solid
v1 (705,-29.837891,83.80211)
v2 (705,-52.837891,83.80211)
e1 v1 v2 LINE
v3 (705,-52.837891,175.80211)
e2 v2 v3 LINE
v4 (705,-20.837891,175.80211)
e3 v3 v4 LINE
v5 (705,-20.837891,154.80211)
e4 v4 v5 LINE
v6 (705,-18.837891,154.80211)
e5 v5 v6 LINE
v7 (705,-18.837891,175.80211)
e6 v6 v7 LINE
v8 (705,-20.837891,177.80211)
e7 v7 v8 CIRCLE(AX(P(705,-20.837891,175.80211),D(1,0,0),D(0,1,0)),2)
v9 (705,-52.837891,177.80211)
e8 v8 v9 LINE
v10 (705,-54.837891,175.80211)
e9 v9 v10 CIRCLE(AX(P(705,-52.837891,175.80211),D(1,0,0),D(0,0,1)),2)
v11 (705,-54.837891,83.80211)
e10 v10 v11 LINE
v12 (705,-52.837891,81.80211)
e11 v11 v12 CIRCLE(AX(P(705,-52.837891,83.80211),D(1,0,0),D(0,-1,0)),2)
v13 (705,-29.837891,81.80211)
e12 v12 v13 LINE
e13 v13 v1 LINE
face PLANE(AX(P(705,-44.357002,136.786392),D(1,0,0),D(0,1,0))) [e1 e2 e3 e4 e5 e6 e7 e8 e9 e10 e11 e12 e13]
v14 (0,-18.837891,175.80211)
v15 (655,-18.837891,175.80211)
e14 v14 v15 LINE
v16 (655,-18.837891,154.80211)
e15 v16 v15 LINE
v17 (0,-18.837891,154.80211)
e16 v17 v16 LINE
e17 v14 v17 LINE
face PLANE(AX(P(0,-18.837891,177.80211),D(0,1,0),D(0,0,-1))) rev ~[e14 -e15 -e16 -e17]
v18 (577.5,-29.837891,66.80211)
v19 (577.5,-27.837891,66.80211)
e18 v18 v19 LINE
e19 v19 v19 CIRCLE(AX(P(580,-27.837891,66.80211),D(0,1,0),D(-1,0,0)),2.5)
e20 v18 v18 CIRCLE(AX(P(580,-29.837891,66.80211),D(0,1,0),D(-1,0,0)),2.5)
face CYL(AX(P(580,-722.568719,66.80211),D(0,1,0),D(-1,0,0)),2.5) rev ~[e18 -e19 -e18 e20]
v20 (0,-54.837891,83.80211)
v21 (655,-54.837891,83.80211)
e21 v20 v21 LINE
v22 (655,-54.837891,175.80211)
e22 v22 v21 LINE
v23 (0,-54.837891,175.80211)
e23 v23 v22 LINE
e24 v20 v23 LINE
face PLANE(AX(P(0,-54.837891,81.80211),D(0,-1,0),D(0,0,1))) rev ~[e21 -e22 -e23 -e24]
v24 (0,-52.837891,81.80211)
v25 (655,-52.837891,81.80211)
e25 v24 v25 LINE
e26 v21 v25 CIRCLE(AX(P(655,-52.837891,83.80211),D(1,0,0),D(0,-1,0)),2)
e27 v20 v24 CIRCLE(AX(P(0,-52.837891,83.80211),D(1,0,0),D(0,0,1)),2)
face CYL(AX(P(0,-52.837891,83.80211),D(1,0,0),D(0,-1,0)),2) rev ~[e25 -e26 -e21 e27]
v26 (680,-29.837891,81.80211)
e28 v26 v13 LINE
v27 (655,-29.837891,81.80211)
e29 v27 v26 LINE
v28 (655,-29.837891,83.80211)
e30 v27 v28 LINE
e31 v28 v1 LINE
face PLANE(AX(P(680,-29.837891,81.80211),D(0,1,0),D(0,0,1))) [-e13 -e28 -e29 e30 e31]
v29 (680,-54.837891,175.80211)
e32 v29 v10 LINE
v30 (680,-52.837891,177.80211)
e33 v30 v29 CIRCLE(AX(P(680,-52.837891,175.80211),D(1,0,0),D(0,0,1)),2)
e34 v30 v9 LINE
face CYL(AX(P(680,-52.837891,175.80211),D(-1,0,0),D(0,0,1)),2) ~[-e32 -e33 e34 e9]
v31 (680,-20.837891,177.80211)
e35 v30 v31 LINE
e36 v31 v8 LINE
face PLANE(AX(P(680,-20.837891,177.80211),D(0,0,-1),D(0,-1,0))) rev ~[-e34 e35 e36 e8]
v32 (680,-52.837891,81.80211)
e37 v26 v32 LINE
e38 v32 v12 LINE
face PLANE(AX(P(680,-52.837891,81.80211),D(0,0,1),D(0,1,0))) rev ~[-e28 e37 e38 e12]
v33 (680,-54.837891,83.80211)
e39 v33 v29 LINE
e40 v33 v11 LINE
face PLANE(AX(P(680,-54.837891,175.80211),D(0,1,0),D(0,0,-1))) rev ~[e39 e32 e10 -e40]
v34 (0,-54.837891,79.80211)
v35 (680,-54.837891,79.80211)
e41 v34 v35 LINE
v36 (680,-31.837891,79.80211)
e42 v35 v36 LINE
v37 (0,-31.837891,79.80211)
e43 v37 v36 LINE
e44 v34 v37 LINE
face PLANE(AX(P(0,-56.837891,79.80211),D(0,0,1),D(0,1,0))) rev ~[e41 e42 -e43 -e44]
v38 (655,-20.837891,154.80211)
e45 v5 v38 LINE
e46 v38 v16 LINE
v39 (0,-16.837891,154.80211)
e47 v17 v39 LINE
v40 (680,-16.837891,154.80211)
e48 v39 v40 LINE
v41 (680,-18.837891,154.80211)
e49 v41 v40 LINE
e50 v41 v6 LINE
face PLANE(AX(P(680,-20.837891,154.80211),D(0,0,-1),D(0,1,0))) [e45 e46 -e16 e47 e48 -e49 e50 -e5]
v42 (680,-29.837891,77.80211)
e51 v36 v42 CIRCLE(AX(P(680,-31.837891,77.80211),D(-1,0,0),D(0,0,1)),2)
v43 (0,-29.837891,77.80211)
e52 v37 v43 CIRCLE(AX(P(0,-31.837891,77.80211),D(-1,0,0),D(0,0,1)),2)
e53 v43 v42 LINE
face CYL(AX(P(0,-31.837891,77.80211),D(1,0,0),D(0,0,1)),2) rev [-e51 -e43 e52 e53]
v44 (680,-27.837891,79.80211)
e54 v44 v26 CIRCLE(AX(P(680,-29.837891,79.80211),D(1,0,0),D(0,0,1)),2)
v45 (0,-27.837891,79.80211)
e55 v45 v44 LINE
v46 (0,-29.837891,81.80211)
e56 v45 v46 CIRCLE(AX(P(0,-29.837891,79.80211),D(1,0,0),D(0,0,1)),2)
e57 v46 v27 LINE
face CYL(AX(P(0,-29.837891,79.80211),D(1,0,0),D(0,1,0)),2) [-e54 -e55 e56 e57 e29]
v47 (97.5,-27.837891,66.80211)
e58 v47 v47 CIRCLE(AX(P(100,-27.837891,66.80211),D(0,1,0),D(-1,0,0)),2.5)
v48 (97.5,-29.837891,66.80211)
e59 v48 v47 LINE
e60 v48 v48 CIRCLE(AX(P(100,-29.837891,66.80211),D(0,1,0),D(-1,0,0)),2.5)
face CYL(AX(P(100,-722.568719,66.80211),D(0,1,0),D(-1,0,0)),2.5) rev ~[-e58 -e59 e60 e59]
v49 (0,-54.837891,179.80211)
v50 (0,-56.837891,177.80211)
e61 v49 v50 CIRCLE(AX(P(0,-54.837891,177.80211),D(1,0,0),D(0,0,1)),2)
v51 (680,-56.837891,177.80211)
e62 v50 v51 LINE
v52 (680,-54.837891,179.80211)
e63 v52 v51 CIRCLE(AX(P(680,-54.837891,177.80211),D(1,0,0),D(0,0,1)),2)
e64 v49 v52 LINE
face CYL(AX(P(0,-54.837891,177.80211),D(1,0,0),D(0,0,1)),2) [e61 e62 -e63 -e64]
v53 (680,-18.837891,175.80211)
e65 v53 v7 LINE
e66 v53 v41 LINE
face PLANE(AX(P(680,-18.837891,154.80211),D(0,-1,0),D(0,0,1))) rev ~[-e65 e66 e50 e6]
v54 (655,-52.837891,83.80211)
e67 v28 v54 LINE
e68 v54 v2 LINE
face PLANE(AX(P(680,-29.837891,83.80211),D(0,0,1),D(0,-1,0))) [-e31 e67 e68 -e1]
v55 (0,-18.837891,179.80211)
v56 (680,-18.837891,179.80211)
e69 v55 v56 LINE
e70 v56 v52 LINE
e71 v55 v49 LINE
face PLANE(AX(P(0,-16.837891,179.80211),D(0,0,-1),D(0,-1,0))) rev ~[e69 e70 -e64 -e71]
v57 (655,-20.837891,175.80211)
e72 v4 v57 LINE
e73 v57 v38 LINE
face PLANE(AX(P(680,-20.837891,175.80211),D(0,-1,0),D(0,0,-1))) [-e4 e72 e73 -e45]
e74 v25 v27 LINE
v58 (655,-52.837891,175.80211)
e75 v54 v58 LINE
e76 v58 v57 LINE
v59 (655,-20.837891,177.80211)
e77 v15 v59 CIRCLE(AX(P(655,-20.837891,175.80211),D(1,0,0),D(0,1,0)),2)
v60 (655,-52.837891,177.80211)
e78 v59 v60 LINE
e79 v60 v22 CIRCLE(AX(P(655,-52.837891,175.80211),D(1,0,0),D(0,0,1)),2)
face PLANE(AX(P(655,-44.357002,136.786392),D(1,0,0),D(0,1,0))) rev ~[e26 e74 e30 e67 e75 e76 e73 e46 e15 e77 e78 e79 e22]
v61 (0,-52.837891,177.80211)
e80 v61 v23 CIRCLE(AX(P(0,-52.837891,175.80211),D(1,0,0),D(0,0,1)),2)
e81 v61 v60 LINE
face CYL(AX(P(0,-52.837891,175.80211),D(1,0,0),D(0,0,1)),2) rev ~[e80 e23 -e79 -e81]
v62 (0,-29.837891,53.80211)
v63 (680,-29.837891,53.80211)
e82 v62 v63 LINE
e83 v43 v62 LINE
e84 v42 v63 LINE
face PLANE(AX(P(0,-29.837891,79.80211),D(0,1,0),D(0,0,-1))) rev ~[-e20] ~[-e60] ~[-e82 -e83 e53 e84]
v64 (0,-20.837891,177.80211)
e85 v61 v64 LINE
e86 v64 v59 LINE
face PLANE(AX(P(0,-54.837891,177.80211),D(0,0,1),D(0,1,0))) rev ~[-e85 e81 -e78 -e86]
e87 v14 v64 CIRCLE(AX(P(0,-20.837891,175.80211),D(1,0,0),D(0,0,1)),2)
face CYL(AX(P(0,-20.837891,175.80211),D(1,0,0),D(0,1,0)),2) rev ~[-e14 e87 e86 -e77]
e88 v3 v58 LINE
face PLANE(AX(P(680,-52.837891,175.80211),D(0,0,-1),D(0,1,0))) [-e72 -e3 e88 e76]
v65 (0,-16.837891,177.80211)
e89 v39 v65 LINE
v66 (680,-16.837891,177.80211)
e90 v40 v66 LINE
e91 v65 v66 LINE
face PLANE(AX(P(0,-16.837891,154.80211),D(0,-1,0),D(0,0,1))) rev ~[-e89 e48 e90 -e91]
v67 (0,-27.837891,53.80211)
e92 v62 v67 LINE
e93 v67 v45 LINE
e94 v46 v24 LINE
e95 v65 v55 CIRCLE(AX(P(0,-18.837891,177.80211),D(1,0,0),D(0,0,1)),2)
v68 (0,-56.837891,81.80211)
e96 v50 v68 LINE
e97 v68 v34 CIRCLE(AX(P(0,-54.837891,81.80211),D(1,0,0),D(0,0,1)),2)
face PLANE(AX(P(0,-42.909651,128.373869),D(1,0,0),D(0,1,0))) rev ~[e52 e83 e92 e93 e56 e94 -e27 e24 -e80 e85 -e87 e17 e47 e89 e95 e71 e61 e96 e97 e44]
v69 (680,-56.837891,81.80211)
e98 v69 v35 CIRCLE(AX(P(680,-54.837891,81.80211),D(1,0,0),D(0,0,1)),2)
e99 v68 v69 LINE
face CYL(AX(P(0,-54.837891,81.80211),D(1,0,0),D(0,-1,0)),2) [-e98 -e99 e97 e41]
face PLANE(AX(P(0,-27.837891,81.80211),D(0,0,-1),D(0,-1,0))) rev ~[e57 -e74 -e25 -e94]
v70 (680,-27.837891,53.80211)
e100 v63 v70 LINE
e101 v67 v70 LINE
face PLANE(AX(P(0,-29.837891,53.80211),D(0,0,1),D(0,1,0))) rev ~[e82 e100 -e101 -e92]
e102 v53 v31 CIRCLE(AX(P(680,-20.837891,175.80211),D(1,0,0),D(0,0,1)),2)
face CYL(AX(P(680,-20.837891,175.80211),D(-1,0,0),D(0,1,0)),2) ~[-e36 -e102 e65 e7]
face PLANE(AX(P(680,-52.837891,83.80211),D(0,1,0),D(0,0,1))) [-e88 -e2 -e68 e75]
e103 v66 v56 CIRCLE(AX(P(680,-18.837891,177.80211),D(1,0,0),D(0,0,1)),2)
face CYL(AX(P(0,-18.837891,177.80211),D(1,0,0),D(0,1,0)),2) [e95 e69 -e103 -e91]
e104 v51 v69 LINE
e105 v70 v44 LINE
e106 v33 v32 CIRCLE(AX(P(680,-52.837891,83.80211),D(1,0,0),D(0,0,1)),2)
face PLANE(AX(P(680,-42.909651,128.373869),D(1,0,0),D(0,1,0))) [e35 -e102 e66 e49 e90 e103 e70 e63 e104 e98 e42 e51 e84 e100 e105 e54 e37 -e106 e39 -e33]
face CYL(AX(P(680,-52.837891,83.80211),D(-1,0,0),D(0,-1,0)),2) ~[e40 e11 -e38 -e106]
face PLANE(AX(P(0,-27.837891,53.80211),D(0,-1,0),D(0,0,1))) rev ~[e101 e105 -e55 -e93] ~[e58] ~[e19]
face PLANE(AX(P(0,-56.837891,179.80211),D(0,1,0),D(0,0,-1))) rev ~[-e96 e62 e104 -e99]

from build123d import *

# Parameters (mm, degrees)
F1_DEPTH      = 680
F3_D          = 5
F4_R          = 2
F6_DEPTH      = 25
F6_DEPTH_BACK = 25


# Not quite as in the source:
# - a feature names something its author has since deleted; it is built from what else it names


with BuildPart() as f1:
    # F0 (on Right) → F1 (new body)
    with BuildSketch(Plane.YZ):
        Polygon((-18.8378913403, 177.8021101952), (-18.8378913403, 154.8021101952), (-16.8378913403, 154.8021101952), (-16.8378913403, 179.8021101952), (-56.8378913403, 179.8021101952), (-56.8378913403, 79.8021101952), (-29.8378913403, 79.8021101952), (-29.8378913403, 53.8021101952), (-27.8378913403, 53.8021101952), (-27.8378913403, 81.8021101952), (-54.8378913403, 81.8021101952), (-54.8378913403, 177.8021101952), align=None)
    extrude(amount=F1_DEPTH)

    # F3 (through all)
    with Locations(Plane.XZ.offset(29.8378913403)):
        with Locations((580, 66.8021101952), (100, 66.8021101952)):
            Hole(F3_D / 2)

    # F4
    f4_edges = [f1.edges().sort_by_distance(p)[0] for p in [
        (340, -56.837891, 179.80211),
        (340, -16.837891, 179.80211),
        (340, -56.837891, 79.80211),
        (340, -27.837891, 81.80211),
        (340, -54.837891, 81.80211),
        (340, -29.837891, 79.80211),
        (340, -18.837891, 177.80211),
        (340, -54.837891, 177.80211),
    ]]
    fillet(f4_edges, radius=F4_R)

    # F5 (on face) → F6 (join, two sides)
    with BuildSketch(Plane.YZ.offset(680)) as f6_sk:
        with BuildLine():
            Line((-20.8378913403, 154.8021101952), (-18.8378913403, 154.8021101952))
            Line((-18.8378913403, 154.8021101952), (-18.8378913403, 175.8021101952))
            ThreePointArc((-18.8378913403, 175.8021101952), (-19.4236777779, 177.2163237575), (-20.8378913403, 177.8021101952))
            Line((-20.8378913403, 177.8021101952), (-52.8378913403, 177.8021101952))
            ThreePointArc((-52.8378913403, 177.8021101952), (-54.2521049026, 177.2163237575), (-54.8378913403, 175.8021101952))
            Line((-54.8378913403, 175.8021101952), (-54.8378913403, 83.8021101952))
            ThreePointArc((-54.8378913403, 83.8021101952), (-54.2521049026, 82.3878966328), (-52.8378913403, 81.8021101952))
            Line((-52.8378913403, 81.8021101952), (-29.8378913403, 81.8021101952))
            Line((-29.8378913403, 81.8021101952), (-29.8378913403, 83.8021101952))
            Line((-29.8378913403, 83.8021101952), (-52.8378913403, 83.8021101952))
            Line((-52.8378913403, 83.8021101952), (-52.8378913403, 175.8021101952))
            Line((-52.8378913403, 175.8021101952), (-20.8378913403, 175.8021101952))
            Line((-20.8378913403, 175.8021101952), (-20.8378913403, 154.8021101952))
        make_face()
    extrude(amount=F6_DEPTH)
    extrude(f6_sk.sketch, amount=-F6_DEPTH_BACK)


solid = f1.part
